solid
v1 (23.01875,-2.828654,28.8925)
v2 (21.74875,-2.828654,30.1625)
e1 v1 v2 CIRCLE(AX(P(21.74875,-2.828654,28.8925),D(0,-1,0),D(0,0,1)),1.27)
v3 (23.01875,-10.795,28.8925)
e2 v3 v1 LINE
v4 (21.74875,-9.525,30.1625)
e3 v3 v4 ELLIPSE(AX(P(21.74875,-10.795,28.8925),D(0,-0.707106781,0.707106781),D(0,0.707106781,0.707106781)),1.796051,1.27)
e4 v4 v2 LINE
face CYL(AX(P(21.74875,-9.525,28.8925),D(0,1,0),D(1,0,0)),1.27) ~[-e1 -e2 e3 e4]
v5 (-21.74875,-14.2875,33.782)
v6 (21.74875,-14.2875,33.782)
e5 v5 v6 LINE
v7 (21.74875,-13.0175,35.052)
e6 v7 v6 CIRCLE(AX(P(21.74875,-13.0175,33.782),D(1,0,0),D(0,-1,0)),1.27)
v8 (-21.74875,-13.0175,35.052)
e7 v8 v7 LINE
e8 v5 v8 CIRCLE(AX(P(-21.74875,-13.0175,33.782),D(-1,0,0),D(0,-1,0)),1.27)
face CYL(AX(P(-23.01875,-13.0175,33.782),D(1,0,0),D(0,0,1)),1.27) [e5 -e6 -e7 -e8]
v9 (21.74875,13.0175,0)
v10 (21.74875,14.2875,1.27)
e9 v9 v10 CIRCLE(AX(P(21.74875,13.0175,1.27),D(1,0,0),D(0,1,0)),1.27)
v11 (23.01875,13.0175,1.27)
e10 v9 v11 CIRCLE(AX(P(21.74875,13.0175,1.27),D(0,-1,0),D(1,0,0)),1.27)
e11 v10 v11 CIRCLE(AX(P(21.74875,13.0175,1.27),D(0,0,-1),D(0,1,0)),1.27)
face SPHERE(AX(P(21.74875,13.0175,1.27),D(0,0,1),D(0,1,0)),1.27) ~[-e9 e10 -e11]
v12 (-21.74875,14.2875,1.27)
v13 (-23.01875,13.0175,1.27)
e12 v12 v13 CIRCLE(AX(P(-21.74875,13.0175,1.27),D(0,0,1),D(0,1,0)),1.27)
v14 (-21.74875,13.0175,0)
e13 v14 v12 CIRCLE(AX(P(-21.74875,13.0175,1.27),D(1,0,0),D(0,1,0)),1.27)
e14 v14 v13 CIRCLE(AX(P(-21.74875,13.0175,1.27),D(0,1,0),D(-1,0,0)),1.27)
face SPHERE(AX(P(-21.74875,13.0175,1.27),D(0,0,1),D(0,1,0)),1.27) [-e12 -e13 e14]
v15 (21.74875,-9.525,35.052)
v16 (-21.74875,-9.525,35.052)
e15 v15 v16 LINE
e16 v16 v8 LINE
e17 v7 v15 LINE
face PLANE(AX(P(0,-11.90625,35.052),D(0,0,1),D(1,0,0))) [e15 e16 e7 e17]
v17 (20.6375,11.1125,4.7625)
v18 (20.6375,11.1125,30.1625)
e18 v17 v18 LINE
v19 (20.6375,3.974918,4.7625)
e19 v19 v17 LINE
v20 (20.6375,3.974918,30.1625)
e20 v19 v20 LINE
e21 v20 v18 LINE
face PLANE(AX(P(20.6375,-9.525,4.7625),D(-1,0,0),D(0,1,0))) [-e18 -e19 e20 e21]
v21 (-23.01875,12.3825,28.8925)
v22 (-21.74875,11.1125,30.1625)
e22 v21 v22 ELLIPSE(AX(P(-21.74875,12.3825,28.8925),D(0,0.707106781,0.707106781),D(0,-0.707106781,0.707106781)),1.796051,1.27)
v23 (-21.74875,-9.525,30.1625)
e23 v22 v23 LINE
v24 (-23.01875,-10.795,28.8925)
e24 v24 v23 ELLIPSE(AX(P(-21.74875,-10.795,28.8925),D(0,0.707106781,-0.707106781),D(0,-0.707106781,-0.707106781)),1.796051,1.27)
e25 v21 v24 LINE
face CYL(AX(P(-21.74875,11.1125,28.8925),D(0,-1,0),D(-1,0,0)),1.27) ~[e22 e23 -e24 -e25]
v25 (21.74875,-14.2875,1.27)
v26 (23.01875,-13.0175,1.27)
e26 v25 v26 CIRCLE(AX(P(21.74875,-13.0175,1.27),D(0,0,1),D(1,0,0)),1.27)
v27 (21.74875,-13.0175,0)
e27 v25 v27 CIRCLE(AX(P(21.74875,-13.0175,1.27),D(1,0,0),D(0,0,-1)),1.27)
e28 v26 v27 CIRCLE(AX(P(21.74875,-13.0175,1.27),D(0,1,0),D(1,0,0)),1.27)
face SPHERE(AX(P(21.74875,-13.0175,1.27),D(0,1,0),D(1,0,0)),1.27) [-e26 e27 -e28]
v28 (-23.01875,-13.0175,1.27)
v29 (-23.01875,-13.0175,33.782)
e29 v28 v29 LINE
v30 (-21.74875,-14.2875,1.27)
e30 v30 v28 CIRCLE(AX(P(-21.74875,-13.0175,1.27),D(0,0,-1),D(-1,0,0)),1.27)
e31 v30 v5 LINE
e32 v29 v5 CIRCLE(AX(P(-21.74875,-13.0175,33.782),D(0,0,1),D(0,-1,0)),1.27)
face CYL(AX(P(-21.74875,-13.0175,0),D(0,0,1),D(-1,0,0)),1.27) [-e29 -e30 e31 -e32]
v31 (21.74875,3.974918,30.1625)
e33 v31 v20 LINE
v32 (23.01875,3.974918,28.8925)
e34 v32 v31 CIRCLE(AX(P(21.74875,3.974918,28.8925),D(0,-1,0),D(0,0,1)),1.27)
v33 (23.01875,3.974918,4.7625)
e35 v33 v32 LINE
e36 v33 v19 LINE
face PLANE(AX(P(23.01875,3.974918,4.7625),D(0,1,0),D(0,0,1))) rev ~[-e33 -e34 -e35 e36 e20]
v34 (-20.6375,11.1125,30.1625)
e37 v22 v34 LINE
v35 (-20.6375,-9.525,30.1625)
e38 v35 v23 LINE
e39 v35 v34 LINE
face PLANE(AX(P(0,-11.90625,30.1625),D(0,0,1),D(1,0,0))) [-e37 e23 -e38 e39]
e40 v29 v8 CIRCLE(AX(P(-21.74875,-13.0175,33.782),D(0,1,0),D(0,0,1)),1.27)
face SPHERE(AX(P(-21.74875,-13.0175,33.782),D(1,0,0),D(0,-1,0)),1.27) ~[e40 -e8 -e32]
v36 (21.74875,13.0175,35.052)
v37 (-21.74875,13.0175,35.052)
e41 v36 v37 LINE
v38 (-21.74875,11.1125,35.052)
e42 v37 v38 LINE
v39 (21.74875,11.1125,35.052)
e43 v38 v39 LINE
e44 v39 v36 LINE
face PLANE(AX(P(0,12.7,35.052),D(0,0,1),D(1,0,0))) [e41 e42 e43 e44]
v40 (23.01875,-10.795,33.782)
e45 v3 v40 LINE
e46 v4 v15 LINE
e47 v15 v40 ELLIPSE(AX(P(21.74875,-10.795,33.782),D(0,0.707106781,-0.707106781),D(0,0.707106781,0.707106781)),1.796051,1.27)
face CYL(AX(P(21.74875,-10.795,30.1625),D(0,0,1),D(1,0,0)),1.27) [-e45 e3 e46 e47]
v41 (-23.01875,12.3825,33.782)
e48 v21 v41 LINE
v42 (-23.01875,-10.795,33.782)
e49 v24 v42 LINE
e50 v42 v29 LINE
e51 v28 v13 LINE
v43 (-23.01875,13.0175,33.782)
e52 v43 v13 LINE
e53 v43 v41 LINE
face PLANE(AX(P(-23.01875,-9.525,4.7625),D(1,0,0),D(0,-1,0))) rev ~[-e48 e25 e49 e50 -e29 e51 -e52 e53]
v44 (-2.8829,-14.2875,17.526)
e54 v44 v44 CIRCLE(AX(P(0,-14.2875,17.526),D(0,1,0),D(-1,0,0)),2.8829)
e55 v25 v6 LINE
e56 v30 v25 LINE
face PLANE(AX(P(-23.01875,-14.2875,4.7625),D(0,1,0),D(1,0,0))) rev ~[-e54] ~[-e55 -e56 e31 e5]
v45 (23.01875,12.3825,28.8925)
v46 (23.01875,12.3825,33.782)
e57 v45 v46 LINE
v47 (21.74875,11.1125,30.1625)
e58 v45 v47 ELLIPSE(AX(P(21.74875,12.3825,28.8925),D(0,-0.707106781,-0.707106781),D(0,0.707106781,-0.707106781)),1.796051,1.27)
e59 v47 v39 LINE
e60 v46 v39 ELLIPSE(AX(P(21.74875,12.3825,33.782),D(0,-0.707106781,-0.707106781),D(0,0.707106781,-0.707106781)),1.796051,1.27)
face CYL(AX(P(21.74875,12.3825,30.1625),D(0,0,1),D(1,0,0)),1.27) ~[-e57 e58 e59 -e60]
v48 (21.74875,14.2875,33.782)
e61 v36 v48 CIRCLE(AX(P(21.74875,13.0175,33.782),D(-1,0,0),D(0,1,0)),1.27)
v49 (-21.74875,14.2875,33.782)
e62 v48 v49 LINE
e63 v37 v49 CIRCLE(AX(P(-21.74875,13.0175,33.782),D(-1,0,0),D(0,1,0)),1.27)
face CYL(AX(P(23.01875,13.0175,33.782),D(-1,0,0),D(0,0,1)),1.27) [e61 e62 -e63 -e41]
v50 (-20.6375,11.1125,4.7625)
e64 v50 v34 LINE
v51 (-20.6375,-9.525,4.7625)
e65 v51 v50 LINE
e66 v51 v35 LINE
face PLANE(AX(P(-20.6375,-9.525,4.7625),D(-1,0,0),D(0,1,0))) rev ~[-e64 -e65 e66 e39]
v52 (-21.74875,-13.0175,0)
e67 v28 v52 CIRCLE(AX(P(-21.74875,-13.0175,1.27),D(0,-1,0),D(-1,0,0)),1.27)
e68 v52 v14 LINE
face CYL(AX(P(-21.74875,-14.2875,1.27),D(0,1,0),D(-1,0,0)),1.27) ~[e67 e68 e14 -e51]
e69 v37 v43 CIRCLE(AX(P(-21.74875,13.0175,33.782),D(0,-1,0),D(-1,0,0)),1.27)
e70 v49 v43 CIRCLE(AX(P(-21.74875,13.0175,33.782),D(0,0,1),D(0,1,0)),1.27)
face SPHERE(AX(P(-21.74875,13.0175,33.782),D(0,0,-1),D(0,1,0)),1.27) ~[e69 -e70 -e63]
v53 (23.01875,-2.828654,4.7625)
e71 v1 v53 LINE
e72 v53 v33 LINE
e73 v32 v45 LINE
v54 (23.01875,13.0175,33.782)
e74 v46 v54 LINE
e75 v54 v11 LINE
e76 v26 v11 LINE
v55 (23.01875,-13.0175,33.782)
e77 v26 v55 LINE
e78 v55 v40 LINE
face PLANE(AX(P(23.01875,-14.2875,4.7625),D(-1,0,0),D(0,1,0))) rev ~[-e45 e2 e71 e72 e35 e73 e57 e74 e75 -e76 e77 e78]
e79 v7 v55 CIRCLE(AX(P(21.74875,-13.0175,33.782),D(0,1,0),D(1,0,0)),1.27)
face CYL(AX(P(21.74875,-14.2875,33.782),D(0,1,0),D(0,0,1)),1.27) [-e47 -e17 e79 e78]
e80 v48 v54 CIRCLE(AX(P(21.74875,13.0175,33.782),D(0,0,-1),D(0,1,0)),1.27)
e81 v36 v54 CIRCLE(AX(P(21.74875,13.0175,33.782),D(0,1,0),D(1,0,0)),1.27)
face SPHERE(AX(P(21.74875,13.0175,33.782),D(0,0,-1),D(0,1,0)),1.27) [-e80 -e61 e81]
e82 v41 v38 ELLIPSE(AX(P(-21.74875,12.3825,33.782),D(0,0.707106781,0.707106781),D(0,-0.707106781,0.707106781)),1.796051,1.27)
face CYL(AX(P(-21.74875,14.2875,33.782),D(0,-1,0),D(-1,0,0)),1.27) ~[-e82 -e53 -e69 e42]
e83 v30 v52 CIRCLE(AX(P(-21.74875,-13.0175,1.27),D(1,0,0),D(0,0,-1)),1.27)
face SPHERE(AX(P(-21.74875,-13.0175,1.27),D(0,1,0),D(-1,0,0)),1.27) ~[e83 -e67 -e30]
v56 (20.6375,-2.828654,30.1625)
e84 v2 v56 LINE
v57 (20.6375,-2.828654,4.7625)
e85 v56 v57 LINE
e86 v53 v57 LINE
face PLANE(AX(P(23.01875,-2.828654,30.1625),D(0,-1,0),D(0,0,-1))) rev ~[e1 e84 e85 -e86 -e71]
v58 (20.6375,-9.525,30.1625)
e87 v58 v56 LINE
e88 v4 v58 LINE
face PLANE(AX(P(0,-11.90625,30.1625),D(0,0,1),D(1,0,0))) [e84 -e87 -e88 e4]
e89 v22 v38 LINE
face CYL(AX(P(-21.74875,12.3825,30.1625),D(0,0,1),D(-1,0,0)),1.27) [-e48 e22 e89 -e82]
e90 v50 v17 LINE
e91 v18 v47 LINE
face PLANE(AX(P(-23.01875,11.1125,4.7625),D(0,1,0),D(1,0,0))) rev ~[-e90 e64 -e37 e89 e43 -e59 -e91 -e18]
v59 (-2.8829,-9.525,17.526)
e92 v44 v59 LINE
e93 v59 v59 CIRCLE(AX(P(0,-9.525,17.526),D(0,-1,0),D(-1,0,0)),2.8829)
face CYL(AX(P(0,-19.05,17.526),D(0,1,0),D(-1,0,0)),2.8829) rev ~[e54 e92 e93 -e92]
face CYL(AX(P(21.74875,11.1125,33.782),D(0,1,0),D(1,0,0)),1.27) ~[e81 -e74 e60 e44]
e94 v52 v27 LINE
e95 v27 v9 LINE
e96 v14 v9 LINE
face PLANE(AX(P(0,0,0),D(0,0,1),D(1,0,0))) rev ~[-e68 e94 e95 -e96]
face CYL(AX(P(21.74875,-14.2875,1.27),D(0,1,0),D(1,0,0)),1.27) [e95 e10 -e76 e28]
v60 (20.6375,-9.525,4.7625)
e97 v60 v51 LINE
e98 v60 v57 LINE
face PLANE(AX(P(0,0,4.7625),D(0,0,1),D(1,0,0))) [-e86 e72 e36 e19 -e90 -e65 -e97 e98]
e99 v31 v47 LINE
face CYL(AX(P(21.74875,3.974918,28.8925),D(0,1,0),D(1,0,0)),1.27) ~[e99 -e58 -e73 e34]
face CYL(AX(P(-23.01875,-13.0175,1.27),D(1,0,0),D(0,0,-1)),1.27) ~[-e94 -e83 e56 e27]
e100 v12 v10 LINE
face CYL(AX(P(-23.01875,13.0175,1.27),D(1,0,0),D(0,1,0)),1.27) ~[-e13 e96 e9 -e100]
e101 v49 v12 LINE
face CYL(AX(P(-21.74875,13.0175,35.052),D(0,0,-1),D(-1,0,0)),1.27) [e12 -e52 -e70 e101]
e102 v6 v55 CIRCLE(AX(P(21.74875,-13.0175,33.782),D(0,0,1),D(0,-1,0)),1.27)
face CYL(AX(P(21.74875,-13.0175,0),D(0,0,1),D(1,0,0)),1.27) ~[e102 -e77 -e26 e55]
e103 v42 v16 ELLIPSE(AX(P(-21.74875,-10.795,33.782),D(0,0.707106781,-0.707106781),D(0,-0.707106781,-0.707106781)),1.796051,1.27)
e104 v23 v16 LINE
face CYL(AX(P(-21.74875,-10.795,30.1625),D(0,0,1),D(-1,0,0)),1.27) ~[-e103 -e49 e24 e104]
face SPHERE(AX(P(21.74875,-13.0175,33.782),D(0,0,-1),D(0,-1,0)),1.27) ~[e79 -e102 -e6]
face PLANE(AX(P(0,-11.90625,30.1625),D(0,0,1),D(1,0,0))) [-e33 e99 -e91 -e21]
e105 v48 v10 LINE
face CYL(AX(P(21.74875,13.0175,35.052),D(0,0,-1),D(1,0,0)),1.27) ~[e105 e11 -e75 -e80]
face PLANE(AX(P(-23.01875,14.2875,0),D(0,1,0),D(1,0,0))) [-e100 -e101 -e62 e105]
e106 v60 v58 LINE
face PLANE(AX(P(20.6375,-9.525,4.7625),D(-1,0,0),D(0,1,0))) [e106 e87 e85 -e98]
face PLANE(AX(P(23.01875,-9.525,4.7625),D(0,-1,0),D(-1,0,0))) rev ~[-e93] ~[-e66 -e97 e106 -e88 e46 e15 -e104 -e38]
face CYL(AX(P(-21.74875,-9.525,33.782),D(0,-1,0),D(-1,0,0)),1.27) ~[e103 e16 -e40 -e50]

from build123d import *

# Parameters (mm, degrees)
F0_W     = 46.0375
F0_H     = 28.575
F1_DEPTH = 4.7625
F3_DEPTH = 30.2895
F2_W     = 2.38125
F2_H     = 20.6375
F4_DEPTH = 25.4
F6_DEPTH = 2.38125
F8_D     = 5.7658
F8_DEPTH = 4.7625
F8_TIP   = 1.7322210786
F9_R     = 1.27


# Not quite as in the source:
# - a feature names something its author has since deleted; it is built from what else it names


with BuildPart() as f1:
    # F0 (on Top) → F1 (new body)
    with BuildSketch(Plane.XY):
        Rectangle(F0_W, F0_H)
    extrude(amount=F1_DEPTH)

    # F2 (on face) → F3 (join)
    with BuildSketch(Plane.XY.offset(4.7625)):
        Polygon((-23.01875, -9.525), (-23.01875, -14.2875), (23.01875, -14.2875), (23.01875, -9.525), (20.6375, -9.525), (-20.6375, -9.525), align=None)
        Polygon((-23.01875, 14.2875), (-23.01875, 11.1125), (-20.6375, 11.1125), (20.6375, 11.1125), (23.01875, 11.1125), (23.01875, 14.2875), align=None)
    extrude(amount=F3_DEPTH)

    # F2 (on face) → F4 (join)
    with BuildSketch(Plane.XY.offset(4.7625)):
        Polygon((-23.01875, -9.525), (-23.01875, -14.2875), (23.01875, -14.2875), (23.01875, -9.525), (20.6375, -9.525), (-20.6375, -9.525), align=None)
        with Locations((-21.828125, 0.79375)):
            Rectangle(F2_W, F2_H)
        with Locations((21.828125, 0.79375)):
            Rectangle(F2_W, F2_H)
        Polygon((-23.01875, 14.2875), (-23.01875, 11.1125), (-20.6375, 11.1125), (20.6375, 11.1125), (23.01875, 11.1125), (23.01875, 14.2875), align=None)
    extrude(amount=F4_DEPTH)

    # F5 (on face) → F6 (cut, through all)
    with BuildSketch(Plane.YZ.offset(23.01875)):
        Polygon((3.9749178039, 30.1625), (0.3463463753, 30.1625), (-2.8286536247, 30.1625), (-2.8286536247, 16.5712326925), (-2.8286536247, 11.8087326925), (-2.8286536247, 4.7625), (0.3463463753, 4.7625), (3.9749178039, 4.7625), (3.9749178039, 16.5712326925), align=None)
    extrude(amount=-F6_DEPTH, mode=Mode.SUBTRACT)

    # F8
    with Locations(Plane.XZ.offset(14.2875)):
        with Locations((0, 17.526)):
            Hole(F8_D / 2, depth=F8_DEPTH)
            with Locations((0, 0, -(F8_DEPTH + F8_TIP / 2))):  # 118° drill point
                Cone(0, F8_D / 2, F8_TIP, mode=Mode.SUBTRACT)

    # F9
    f9_edges = [f1.edges().sort_by_distance(p)[0] for p in [
        (23.01875, 14.2875, 17.526),
        (-23.01875, 14.2875, 17.526),
        (0, 14.2875, 35.052),
        (0, 14.2875, 0),
        (23.01875, 0, 0),
        (-23.01875, 0, 0),
        (23.01875, 12.7, 35.052),
        (-23.01875, 12.7, 35.052),
        (23.01875, -14.2875, 17.526),
        (0, -14.2875, 35.052),
        (-23.01875, -14.2875, 17.526),
        (0, -14.2875, 0),
        (23.01875, -11.90625, 35.052),
        (-23.01875, -11.90625, 35.052),
        (-23.01875, 0.79375, 30.1625),
        (23.01875, 7.543709, 30.1625),
        (23.01875, -6.176827, 30.1625),
        (23.01875, -9.525, 32.60725),
        (-23.01875, -9.525, 32.60725),
        (-23.01875, 11.1125, 32.60725),
        (23.01875, 11.1125, 32.60725),
    ]]
    fillet(f9_edges, radius=F9_R)


solid = f1.part
